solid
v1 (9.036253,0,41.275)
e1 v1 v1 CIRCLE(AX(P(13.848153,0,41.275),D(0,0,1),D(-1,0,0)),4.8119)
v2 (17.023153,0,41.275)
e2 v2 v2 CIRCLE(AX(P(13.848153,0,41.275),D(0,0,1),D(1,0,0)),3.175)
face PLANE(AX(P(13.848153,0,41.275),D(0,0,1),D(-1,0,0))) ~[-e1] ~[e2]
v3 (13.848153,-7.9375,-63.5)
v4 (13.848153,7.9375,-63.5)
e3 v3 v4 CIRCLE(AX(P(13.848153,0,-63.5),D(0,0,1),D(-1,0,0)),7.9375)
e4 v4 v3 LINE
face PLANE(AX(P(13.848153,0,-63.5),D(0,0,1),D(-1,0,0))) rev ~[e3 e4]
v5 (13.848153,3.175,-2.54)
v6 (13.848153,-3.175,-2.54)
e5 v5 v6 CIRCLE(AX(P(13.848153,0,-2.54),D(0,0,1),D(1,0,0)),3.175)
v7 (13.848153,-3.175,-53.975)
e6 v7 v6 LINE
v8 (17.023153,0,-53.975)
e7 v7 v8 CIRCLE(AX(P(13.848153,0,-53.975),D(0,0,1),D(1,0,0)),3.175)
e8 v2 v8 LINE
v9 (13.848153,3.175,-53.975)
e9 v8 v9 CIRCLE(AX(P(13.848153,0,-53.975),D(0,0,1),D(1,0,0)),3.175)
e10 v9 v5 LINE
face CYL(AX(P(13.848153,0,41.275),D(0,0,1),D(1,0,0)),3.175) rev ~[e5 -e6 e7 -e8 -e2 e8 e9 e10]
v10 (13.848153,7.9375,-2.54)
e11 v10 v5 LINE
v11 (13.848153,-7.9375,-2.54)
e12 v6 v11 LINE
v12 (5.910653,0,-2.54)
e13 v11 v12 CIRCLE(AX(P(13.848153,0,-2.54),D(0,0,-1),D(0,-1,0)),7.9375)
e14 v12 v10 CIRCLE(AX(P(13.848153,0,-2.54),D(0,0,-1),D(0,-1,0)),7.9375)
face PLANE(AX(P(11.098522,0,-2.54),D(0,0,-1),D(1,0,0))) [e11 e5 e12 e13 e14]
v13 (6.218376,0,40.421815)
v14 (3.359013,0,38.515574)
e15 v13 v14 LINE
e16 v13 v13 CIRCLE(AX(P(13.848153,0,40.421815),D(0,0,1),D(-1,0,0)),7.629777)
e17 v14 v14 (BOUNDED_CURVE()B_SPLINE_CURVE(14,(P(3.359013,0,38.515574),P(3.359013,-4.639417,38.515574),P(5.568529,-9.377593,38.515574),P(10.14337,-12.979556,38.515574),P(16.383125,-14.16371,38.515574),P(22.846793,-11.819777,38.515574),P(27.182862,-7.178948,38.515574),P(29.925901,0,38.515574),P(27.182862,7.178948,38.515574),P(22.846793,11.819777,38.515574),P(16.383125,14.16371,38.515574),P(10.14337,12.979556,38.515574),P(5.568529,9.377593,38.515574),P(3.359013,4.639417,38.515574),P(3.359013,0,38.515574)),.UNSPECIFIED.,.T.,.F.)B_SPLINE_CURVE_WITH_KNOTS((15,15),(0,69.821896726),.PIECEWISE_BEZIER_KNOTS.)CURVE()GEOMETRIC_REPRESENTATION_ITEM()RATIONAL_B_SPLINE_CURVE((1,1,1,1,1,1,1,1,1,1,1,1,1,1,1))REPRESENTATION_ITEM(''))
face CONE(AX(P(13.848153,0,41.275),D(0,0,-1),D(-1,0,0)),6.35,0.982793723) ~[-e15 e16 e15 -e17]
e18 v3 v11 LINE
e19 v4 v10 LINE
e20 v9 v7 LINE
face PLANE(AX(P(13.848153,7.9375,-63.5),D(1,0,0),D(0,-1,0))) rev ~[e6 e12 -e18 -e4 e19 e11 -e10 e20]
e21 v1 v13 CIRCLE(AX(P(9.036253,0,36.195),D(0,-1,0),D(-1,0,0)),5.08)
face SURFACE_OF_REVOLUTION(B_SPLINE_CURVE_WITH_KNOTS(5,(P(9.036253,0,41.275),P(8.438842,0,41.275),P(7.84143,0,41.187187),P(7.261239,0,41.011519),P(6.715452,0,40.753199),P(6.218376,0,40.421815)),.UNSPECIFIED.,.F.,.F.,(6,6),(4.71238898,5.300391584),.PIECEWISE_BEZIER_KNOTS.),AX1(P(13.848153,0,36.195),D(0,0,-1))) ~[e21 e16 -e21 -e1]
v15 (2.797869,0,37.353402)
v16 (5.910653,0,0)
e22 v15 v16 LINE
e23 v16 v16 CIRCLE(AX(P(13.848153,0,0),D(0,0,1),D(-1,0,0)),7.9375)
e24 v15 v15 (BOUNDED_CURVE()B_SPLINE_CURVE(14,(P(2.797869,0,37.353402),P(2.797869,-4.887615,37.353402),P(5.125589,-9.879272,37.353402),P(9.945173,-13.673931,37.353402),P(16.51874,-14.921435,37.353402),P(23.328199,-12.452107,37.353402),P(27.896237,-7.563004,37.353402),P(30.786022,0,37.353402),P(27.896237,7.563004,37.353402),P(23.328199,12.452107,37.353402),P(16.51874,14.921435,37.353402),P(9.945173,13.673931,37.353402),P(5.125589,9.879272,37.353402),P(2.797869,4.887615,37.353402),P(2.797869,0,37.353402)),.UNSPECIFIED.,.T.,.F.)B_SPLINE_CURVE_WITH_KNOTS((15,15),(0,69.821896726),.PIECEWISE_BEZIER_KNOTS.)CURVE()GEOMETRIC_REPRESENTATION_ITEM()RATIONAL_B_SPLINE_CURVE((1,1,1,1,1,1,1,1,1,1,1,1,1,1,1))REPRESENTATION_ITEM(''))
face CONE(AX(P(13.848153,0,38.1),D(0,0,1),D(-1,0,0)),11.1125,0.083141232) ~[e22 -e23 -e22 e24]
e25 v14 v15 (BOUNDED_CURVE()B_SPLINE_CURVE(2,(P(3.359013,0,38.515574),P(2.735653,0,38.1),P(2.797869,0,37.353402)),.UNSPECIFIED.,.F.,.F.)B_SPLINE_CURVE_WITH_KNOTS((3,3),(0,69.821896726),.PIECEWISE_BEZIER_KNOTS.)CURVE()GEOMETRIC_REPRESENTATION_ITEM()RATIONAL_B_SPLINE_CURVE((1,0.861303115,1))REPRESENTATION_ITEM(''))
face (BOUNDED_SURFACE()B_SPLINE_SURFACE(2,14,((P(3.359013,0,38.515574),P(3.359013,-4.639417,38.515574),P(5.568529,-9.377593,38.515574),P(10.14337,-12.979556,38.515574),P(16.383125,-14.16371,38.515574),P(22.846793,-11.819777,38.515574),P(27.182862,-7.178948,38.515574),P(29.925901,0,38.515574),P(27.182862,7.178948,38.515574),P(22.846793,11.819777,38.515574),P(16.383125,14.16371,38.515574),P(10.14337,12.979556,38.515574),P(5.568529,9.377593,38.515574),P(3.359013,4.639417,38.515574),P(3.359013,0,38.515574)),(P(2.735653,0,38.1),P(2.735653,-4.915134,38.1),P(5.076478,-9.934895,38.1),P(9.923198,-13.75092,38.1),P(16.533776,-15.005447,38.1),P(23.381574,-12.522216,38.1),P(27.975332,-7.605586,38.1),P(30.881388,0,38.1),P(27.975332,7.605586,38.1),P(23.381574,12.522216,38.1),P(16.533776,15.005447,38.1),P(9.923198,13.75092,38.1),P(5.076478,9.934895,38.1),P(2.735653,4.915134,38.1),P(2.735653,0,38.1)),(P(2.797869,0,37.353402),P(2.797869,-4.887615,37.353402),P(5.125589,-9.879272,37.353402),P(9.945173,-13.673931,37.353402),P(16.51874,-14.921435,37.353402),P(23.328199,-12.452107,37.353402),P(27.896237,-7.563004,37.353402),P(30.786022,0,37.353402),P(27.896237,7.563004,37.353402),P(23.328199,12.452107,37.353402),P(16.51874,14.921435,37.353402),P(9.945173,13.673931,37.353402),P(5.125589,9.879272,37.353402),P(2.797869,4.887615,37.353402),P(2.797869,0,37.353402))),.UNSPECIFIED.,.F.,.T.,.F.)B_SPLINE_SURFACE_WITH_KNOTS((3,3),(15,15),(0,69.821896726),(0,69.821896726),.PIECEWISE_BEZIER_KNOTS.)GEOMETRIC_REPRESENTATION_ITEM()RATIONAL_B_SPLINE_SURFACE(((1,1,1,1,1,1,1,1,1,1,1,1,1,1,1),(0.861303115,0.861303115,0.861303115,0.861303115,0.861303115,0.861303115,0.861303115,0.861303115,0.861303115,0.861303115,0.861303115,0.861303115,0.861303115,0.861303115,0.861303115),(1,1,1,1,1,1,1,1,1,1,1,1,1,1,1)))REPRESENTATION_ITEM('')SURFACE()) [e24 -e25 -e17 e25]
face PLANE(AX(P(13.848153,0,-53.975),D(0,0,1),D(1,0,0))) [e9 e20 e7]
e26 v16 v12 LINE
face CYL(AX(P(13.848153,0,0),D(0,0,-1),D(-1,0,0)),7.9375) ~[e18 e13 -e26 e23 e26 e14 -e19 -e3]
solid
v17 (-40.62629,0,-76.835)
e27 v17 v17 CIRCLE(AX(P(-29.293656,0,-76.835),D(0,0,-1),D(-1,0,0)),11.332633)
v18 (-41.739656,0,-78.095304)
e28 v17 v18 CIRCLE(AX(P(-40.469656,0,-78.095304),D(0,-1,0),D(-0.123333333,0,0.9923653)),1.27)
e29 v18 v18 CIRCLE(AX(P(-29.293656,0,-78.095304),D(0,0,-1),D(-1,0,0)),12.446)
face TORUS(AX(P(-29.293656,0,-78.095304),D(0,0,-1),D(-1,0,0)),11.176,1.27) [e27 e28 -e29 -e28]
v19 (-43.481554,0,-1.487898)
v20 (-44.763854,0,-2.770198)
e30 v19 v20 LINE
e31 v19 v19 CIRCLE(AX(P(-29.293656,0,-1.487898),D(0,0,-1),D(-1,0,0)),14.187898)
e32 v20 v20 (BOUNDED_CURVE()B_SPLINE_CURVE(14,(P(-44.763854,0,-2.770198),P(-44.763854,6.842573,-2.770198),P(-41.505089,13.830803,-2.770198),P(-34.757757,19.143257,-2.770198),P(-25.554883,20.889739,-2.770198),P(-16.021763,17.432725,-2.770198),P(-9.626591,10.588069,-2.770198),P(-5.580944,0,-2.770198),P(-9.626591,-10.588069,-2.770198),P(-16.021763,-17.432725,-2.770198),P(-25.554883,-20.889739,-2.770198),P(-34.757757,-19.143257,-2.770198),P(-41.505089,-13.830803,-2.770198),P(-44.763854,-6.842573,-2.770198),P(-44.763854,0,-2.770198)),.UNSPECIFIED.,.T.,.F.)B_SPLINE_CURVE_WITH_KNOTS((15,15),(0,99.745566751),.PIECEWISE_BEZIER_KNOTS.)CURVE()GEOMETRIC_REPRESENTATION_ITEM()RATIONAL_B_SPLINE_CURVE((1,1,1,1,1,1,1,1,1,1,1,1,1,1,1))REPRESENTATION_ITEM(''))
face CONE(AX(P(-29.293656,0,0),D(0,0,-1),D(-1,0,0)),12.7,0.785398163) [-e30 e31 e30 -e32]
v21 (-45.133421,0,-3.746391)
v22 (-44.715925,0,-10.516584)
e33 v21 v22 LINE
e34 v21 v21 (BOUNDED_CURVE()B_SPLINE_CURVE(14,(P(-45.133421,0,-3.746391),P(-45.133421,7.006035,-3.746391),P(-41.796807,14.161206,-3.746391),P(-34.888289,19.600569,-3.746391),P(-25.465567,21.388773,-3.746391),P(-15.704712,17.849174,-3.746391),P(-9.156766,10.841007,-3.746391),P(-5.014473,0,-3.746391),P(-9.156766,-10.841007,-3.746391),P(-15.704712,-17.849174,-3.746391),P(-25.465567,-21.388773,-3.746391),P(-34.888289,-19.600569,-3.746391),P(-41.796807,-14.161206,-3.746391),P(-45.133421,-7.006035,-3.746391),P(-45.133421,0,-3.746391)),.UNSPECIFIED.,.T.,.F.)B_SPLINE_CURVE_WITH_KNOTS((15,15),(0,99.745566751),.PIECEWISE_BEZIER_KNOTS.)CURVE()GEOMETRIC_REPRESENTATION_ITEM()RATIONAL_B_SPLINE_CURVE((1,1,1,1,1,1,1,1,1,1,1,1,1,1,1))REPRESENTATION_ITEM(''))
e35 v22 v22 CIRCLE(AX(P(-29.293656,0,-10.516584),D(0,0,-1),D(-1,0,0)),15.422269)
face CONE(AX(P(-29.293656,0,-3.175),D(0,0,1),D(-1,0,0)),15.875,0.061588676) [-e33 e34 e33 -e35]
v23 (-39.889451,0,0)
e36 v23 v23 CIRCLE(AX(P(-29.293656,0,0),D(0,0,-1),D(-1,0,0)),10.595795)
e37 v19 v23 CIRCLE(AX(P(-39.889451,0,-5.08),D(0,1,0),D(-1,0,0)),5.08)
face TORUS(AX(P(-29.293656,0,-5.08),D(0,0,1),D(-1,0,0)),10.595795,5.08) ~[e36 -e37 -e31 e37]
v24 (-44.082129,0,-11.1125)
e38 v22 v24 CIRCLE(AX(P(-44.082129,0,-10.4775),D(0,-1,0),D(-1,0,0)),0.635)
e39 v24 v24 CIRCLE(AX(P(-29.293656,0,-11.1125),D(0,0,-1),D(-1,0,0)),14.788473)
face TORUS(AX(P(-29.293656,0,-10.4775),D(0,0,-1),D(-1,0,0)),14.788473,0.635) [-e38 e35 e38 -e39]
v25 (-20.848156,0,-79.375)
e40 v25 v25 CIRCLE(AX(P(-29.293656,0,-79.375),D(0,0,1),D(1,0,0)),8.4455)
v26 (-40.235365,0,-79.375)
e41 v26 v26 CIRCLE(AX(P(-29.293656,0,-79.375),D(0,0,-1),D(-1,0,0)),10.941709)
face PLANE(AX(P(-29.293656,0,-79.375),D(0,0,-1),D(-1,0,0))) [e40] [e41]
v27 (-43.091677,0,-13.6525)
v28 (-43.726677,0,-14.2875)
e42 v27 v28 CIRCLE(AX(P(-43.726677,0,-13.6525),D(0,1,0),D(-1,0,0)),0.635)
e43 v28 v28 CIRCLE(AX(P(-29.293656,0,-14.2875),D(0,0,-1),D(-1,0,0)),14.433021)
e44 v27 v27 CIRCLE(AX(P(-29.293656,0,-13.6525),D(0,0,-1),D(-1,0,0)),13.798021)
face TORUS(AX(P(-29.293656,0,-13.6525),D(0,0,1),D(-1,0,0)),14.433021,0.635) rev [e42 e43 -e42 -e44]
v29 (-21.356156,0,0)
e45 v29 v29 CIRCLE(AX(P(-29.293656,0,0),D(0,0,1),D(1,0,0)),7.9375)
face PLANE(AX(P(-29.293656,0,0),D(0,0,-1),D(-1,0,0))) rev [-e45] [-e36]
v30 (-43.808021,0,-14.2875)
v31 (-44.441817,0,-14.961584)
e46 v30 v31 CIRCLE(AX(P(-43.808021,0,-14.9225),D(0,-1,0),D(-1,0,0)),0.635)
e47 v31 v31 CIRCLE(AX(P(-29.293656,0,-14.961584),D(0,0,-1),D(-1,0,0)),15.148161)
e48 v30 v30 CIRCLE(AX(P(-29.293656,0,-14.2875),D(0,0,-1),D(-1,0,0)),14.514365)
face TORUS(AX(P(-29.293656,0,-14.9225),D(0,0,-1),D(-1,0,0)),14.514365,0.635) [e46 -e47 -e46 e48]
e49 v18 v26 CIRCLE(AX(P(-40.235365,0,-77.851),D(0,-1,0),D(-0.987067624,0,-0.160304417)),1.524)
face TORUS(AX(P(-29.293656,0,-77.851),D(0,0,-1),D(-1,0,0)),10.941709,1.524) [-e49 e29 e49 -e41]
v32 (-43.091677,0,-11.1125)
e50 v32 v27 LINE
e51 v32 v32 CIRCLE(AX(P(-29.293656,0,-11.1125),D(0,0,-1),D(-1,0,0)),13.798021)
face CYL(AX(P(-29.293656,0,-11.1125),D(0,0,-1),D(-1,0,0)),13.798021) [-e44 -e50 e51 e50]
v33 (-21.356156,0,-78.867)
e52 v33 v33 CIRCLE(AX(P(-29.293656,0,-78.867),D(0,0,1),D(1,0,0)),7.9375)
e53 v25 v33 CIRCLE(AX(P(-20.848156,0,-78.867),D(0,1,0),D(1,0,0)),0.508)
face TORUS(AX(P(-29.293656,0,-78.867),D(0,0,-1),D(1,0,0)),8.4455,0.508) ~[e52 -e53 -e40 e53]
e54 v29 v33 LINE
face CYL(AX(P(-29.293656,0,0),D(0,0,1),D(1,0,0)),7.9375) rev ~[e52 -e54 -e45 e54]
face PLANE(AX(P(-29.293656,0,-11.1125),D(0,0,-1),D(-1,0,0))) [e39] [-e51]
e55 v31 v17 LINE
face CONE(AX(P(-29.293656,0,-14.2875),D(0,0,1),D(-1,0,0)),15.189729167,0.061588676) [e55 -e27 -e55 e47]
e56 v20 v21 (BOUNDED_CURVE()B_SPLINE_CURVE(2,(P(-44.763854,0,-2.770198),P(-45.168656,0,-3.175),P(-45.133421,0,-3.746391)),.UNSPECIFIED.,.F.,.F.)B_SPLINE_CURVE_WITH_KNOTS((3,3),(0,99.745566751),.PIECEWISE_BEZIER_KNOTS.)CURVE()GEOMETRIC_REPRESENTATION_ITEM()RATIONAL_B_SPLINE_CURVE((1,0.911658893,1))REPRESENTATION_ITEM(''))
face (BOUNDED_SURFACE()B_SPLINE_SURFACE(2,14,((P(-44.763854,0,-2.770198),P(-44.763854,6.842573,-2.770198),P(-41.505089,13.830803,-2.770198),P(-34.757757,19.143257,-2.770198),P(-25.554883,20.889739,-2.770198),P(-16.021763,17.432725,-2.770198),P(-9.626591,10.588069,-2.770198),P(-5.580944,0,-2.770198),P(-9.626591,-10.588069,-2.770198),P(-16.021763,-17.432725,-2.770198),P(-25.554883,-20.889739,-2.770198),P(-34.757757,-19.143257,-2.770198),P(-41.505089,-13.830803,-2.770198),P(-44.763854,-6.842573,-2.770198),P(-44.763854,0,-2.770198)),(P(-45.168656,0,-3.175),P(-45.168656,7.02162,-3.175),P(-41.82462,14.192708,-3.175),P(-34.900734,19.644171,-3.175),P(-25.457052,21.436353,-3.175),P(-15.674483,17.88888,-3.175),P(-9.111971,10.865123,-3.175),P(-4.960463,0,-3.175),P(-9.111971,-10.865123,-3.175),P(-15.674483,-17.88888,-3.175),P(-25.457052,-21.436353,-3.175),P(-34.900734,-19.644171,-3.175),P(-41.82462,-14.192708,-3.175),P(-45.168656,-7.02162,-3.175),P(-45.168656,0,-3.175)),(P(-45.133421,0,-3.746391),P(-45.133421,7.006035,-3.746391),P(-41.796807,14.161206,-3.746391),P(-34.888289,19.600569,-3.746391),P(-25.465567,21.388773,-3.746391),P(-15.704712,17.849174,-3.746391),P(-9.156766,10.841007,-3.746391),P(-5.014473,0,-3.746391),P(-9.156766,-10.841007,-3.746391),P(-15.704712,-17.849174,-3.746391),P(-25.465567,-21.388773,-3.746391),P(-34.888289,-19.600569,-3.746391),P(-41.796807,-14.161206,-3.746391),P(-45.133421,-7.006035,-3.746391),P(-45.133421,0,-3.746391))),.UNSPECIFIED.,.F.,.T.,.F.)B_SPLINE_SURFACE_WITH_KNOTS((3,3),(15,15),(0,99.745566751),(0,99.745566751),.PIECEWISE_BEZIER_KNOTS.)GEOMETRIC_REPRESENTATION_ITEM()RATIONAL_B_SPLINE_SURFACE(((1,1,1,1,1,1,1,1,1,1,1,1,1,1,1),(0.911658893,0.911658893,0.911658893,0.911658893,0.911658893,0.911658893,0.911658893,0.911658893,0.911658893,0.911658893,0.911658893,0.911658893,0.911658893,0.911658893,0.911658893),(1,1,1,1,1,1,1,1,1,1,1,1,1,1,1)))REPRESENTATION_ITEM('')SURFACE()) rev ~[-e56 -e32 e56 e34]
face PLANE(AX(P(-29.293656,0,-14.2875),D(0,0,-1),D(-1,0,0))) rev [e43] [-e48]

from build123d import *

# Parameters (mm, degrees)
F2_R     = 7.9375
F3_DEPTH = 79.376
F7_DEPTH = 60.96
F8_R     = 3.175
F9_DEPTH = 95.25
F10_R    = 5.08
F11_R    = 1.27
F12_R    = 5.08
F13_R    = 1.27
F14_R    = 0.635
F15_R    = 0.635
F18_R    = 0.508


# Not quite as in the source:
# - a fillet or chamfer that OpenCascade refuses, or shapes differently, is made with other operations: its cross-section is extruded or revolved along the edge and cut away or added


with BuildPart() as f1:
    # F0 (on Front) → F1 (revolve)
    with BuildSketch(Plane.XZ):
        Polygon((-41.9936563492, 0), (-45.1686563492, -3.175), (-29.2936563492, -3.175), (-29.2936563492, 0), align=None)
        Polygon((-29.2936563492, -3.175), (-45.1686563492, -3.175), (-44.6791771825, -11.1125), (-43.0916771825, -11.1125), (-43.0916771825, -12.7), (-29.2936563492, -12.7), align=None)
        Polygon((-29.2936563492, -76.835), (-29.2936563492, -12.7), (-43.0916771825, -12.7), (-43.0916771825, -14.2875), (-44.4833855158, -14.2875), (-40.6262896825, -76.835), align=None)
        Polygon((-29.2936563492, -79.375), (-29.2936563492, -76.835), (-40.6262896825, -76.835), (-40.4696563492, -79.375), align=None)
        Polygon((-40.4696563492, -79.375), (-40.6262896825, -76.835), (-41.7396563492, -76.835), (-41.7396563492, -79.375), align=None)
    revolve(axis=Axis((-29.2936563492, 0, -41.275), (0, 0, -1)))

    # F2 (on face) → F3 (cut, through all)
    with BuildSketch(Plane.XY):
        with Locations((-29.2936563492, 0)):
            Circle(F2_R)
    extrude(amount=-F3_DEPTH, mode=Mode.SUBTRACT)

    # F12
    f12_edges = [f1.edges().sort_by_distance(p)[0] for p in [
        (-16.593656, 0, 0),
    ]]
    fillet(f12_edges, radius=F12_R)

    # F13
    f13_edges = [f1.edges().sort_by_distance(p)[0] for p in [
        (-13.418656, 0, -3.175),
    ]]
    fillet(f13_edges, radius=F13_R)

    # F14
    f14_edges = [f1.edges().sort_by_distance(p)[0] for p in [
        (-14.103927, 0, -14.2875),
        (-13.908136, 0, -11.1125),
    ]]
    fillet(f14_edges, radius=F14_R)

    # F15
    f15_edges = [f1.edges().sort_by_distance(p)[0] for p in [
        (-15.495636, 0, -14.2875),
        (-14.505183, 0, -11.1125),
    ]]
    fillet(f15_edges, radius=F15_R)

    # F16: fillet of radius 1.27 on 1 edges, made by hand

    # F16_s1 → F16_t2 (revolve, cut)
    with BuildSketch(Plane.XZ):
        with BuildLine():
            ThreePointArc((-40.6262896825, -76.835), (-41.4214505321, -77.2544782457), (-41.7396563492, -78.0953039312))
            Line((-41.7396563492, -78.0953039312), (-41.7650563492, -78.0953039312))
            Line((-41.7650563492, -78.0953039312), (-41.7650563492, -76.835))
            Line((-41.7650563492, -76.835), (-41.7396563492, -76.8096))
            ThreePointArc((-41.7396563492, -76.8096), (-41.1829730158, -76.8096), (-40.6294223492, -76.8097939214))
            Line((-40.6294223492, -76.8097939214), (-40.6262896825, -76.835))
        make_face()
    revolve(axis=Axis((-29.2936563492, 0, -76.835), (0, 0, -1)), mode=Mode.SUBTRACT)

    # F17: fillet of radius 1.524 on 1 edges, made by hand

    # F17_s1 → F17_t2 (revolve, cut)
    with BuildSketch(Plane.XZ):
        with BuildLine():
            ThreePointArc((-41.7396563492, -78.0953039312), (-41.2228511914, -79.0117961042), (-40.2353652905, -79.375))
            Line((-40.2353652905, -79.375), (-40.2353652905, -79.40548))
            Line((-40.2353652905, -79.40548), (-41.7396563492, -79.40548))
            Line((-41.7396563492, -79.40548), (-41.7701363492, -79.375))
            ThreePointArc((-41.7701363492, -79.375), (-41.7701363492, -78.7351519656), (-41.7697421704, -78.1001900098))
            Line((-41.7697421704, -78.1001900098), (-41.7396563492, -78.0953039312))
        make_face()
    revolve(axis=Axis((-29.2936563492, 0, -79.375), (0, 0, -1)), mode=Mode.SUBTRACT)

    # F18
    f18_edges = [f1.edges().sort_by_distance(p)[0] for p in [
        (-37.231156, 0, -79.375),
    ]]
    fillet(f18_edges, radius=F18_R)


with BuildPart() as f5:
    # F4 (on Front) → F5 (revolve)
    with BuildSketch(Plane.XZ):
        Polygon((13.8481526896, -63.5), (13.8481526896, 0), (13.8481526896, 38.1), (2.7356526896, 38.1), (5.9106526896, 0), (5.9106526896, -63.5), align=None)
        Polygon((2.7356526896, 38.1), (13.8481526896, 38.1), (13.8481526896, 41.275), (7.4981526896, 41.275), align=None)
    revolve(axis=Axis((13.8481526896, 0, 19.05), (0, 0, 1)))

    # F6 (on face) → F7 (cut)
    with BuildSketch(Plane(origin=(0, 0, -63.5), x_dir=(1, 0, 0), z_dir=(0, 0, -1))):
        with BuildLine():
            Line((13.8481526896, -7.9375), (13.8481526896, 7.9375))
            ThreePointArc((13.8481526896, 7.9375), (5.9106526896, 0), (13.8481526896, -7.9375))
        make_face()
    extrude(amount=-F7_DEPTH, mode=Mode.SUBTRACT)

    # F8 (on face) → F9 (cut)
    with BuildSketch(Plane.XY.offset(41.275)):
        with Locations((13.8481526896, 0)):
            Circle(F8_R)
    extrude(amount=-F9_DEPTH, mode=Mode.SUBTRACT)

    # F10
    f10_edges = [f5.edges().sort_by_distance(p)[0] for p in [
        (20.198153, 0, 41.275),
    ]]
    fillet(f10_edges, radius=F10_R)

    # F11
    f11_edges = [f5.edges().sort_by_distance(p)[0] for p in [
        (24.960653, 0, 38.1),
    ]]
    fillet(f11_edges, radius=F11_R)


solid = Compound([f1.part, f5.part])
